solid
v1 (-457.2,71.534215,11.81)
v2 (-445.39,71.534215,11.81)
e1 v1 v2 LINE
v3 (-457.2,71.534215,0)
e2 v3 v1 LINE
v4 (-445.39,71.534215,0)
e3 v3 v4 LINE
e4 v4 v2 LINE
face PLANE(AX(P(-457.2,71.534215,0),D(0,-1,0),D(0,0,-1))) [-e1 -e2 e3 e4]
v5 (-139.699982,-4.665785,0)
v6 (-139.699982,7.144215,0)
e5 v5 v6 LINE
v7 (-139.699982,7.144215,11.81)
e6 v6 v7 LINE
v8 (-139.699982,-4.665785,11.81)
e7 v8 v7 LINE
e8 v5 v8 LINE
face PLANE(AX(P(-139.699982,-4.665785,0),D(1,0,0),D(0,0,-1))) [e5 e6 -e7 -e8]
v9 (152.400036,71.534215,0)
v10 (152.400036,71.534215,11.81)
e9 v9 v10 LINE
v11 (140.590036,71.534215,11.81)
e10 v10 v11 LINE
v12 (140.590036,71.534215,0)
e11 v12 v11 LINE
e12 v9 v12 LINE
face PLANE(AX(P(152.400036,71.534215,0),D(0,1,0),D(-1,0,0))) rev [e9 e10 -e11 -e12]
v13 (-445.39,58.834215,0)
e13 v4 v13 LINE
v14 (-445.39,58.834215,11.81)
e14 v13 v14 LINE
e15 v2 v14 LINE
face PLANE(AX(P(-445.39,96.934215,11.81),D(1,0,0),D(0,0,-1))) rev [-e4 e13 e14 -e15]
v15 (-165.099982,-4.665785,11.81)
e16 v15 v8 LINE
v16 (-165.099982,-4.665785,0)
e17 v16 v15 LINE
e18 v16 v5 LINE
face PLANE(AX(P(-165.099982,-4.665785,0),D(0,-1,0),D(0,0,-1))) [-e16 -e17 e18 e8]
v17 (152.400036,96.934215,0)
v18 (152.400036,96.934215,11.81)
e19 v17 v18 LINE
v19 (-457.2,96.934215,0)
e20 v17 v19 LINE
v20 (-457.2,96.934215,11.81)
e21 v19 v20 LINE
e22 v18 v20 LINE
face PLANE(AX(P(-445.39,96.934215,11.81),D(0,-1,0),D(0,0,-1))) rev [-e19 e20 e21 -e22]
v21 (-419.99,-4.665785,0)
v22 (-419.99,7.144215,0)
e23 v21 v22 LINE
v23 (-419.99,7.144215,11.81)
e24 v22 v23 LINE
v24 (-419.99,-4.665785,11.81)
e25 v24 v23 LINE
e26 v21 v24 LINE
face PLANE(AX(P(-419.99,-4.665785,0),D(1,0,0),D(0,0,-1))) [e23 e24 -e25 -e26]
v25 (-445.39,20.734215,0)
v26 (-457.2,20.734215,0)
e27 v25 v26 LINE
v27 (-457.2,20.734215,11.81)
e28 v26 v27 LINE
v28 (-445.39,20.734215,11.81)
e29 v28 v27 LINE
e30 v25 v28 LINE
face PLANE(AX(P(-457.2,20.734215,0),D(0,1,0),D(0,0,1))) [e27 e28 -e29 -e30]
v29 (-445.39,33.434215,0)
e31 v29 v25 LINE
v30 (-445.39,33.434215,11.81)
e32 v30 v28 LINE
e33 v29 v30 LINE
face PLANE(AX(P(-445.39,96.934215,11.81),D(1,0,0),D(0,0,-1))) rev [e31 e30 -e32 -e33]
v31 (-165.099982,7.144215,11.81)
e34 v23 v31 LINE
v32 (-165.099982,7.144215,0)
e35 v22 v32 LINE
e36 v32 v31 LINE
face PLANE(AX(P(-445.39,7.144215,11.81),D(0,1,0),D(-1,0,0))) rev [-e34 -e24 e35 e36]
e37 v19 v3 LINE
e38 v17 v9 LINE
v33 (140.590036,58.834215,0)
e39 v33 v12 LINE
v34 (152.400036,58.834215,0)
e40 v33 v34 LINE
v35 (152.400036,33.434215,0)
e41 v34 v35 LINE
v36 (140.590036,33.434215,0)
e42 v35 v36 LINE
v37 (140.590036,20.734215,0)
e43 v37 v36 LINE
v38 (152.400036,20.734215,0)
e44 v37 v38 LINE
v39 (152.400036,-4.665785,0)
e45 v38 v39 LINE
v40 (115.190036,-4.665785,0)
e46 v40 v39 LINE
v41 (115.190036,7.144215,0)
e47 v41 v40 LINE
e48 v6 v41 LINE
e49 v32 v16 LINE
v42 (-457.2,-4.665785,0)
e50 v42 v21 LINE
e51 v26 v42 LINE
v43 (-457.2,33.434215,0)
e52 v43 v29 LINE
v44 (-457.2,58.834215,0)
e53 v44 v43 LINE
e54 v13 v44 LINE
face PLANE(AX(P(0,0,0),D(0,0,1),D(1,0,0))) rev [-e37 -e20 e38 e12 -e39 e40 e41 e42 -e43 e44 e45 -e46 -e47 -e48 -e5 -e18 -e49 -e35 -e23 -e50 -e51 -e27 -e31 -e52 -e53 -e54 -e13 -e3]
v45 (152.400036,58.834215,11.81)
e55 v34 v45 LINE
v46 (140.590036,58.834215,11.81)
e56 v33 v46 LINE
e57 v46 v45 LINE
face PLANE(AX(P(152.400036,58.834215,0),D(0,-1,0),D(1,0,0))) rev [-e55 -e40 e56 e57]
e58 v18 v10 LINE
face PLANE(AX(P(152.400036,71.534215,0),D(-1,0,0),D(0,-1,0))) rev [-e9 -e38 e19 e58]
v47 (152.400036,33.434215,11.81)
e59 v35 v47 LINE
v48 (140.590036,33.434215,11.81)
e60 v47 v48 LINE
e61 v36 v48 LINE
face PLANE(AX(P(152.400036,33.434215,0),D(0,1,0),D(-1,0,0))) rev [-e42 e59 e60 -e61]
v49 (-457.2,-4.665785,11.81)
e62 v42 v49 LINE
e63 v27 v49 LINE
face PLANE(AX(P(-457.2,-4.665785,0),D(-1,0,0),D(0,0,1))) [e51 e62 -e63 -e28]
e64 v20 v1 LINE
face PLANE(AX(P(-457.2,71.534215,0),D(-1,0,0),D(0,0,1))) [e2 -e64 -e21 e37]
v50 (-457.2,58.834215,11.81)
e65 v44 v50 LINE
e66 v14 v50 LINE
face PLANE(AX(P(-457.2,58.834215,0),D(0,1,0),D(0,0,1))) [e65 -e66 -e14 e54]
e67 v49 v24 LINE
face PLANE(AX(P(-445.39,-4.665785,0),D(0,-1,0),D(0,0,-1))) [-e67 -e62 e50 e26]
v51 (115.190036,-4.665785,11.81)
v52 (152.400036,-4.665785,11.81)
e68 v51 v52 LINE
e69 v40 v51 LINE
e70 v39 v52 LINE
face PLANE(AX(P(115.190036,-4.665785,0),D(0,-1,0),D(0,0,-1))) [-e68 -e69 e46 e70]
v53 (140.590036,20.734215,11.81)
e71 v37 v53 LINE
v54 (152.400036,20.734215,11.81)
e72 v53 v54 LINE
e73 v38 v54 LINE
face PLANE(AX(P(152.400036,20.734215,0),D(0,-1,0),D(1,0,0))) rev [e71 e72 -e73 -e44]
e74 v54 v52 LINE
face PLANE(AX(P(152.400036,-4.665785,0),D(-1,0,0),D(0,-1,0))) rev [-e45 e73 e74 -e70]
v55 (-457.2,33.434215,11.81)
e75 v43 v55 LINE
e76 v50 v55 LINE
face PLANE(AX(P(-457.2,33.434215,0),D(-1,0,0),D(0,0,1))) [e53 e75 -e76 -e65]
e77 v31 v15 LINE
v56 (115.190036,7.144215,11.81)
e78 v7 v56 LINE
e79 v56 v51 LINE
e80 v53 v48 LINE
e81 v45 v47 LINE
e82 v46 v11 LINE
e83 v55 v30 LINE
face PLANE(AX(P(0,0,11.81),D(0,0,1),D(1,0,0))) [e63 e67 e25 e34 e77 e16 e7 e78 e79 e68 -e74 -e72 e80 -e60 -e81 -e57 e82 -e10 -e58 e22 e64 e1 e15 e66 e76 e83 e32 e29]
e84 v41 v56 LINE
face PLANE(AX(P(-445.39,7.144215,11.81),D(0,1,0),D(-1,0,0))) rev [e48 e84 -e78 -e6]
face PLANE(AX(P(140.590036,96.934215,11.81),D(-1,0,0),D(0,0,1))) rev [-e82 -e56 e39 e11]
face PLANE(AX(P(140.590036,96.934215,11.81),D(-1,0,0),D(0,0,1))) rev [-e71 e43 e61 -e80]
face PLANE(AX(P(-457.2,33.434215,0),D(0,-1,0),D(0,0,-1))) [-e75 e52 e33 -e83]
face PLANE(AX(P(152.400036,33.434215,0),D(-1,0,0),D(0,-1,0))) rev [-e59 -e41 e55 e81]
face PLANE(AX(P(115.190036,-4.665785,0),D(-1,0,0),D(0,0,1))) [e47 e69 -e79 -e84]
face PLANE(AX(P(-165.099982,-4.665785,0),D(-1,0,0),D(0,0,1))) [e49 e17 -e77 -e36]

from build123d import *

# Parameters (mm, degrees)
BOSS_EXTRUDE1_START     = -445.39
BOSS_EXTRUDE1_OUTLINE_W = 89.79
BOSS_EXTRUDE1_OUTLINE_H = 11.81
BOSS_EXTRUDE1_DEPTH     = 585.980036335
JOINT_X_W               = 25.4
JOINT_X_H               = 11.81
BOSS_EXTRUDE2_DEPTH     = 11.81
LPATTERN1_COUNT         = 3
LPATTERN1_PITCH         = 280.290018167
JOINT_Y_W               = 11.81
JOINT_Y_H               = 25.4
BOSS_EXTRUDE3_DEPTH     = 11.81
LPATTERN2_COUNT         = 3
LPATTERN2_PITCH         = 38.1
MIRROR3_COPY_1_SKETCH_W = 11.81
MIRROR3_COPY_1_SKETCH_H = 25.4
MIRROR3_COPY_1_DEPTH    = 11.81
MIRROR3_COPY_2_SKETCH_W = 11.81
MIRROR3_COPY_2_SKETCH_H = 25.4
MIRROR3_COPY_2_DEPTH    = 11.81


# Read off the part's stored shape, not the designer's step: Boss-Extrude1
with BuildPart() as part:
    # Boss-Extrude1 outline → Boss-Extrude1 (new body)
    with BuildSketch(Plane.YZ.offset(BOSS_EXTRUDE1_START)):
        with Locations((52.039215162, 5.905)):
            Rectangle(BOSS_EXTRUDE1_OUTLINE_W, BOSS_EXTRUDE1_OUTLINE_H)
    extrude(amount=BOSS_EXTRUDE1_DEPTH)

    # Joint_X → Boss-Extrude2 (add)
    with BuildSketch(Plane.XY.offset(11.81)):
        with Locations((-432.69, 1.239215162)):
            Rectangle(JOINT_X_W, JOINT_X_H)
    boss_extrude2 = extrude(amount=-BOSS_EXTRUDE2_DEPTH)

    # LPattern1: Boss-Extrude2 ×3
    with Locations(*[(i * LPATTERN1_PITCH, 0, 0) for i in range(1, LPATTERN1_COUNT)]):
        add(boss_extrude2)

    # Joint_Y → Boss-Extrude3 (add)
    with BuildSketch(Plane.XY.offset(11.81)):
        with Locations((-451.295, 8.034215162)):
            Rectangle(JOINT_Y_W, JOINT_Y_H)
    boss_extrude3 = extrude(amount=-BOSS_EXTRUDE3_DEPTH)

    # LPattern2: Boss-Extrude3 ×3
    with Locations(*[(0, i * LPATTERN2_PITCH, 0) for i in range(1, LPATTERN2_COUNT)]):
        add(boss_extrude3)

    # Mirror3: Boss-Extrude3 across plane
    add(boss_extrude3.mirror(Plane.ZY.offset(152.399981833)))

    # Mirror3 copy 1 sketch → Mirror3 copy 1 (add)
    with BuildSketch(Plane(origin=(-304.799963665, 38.1, 11.81), x_dir=(-1, 0, 0), z_dir=(0, 0, 1))):
        with Locations((-451.295, -8.034215162)):
            Rectangle(MIRROR3_COPY_1_SKETCH_W, MIRROR3_COPY_1_SKETCH_H)
    extrude(amount=-MIRROR3_COPY_1_DEPTH)

    # Mirror3 copy 2 sketch → Mirror3 copy 2 (add)
    with BuildSketch(Plane(origin=(-304.799963665, 76.2, 11.81), x_dir=(-1, 0, 0), z_dir=(0, 0, 1))):
        with Locations((-451.295, -8.034215162)):
            Rectangle(MIRROR3_COPY_2_SKETCH_W, MIRROR3_COPY_2_SKETCH_H)
    extrude(amount=-MIRROR3_COPY_2_DEPTH)


solid = part.part
